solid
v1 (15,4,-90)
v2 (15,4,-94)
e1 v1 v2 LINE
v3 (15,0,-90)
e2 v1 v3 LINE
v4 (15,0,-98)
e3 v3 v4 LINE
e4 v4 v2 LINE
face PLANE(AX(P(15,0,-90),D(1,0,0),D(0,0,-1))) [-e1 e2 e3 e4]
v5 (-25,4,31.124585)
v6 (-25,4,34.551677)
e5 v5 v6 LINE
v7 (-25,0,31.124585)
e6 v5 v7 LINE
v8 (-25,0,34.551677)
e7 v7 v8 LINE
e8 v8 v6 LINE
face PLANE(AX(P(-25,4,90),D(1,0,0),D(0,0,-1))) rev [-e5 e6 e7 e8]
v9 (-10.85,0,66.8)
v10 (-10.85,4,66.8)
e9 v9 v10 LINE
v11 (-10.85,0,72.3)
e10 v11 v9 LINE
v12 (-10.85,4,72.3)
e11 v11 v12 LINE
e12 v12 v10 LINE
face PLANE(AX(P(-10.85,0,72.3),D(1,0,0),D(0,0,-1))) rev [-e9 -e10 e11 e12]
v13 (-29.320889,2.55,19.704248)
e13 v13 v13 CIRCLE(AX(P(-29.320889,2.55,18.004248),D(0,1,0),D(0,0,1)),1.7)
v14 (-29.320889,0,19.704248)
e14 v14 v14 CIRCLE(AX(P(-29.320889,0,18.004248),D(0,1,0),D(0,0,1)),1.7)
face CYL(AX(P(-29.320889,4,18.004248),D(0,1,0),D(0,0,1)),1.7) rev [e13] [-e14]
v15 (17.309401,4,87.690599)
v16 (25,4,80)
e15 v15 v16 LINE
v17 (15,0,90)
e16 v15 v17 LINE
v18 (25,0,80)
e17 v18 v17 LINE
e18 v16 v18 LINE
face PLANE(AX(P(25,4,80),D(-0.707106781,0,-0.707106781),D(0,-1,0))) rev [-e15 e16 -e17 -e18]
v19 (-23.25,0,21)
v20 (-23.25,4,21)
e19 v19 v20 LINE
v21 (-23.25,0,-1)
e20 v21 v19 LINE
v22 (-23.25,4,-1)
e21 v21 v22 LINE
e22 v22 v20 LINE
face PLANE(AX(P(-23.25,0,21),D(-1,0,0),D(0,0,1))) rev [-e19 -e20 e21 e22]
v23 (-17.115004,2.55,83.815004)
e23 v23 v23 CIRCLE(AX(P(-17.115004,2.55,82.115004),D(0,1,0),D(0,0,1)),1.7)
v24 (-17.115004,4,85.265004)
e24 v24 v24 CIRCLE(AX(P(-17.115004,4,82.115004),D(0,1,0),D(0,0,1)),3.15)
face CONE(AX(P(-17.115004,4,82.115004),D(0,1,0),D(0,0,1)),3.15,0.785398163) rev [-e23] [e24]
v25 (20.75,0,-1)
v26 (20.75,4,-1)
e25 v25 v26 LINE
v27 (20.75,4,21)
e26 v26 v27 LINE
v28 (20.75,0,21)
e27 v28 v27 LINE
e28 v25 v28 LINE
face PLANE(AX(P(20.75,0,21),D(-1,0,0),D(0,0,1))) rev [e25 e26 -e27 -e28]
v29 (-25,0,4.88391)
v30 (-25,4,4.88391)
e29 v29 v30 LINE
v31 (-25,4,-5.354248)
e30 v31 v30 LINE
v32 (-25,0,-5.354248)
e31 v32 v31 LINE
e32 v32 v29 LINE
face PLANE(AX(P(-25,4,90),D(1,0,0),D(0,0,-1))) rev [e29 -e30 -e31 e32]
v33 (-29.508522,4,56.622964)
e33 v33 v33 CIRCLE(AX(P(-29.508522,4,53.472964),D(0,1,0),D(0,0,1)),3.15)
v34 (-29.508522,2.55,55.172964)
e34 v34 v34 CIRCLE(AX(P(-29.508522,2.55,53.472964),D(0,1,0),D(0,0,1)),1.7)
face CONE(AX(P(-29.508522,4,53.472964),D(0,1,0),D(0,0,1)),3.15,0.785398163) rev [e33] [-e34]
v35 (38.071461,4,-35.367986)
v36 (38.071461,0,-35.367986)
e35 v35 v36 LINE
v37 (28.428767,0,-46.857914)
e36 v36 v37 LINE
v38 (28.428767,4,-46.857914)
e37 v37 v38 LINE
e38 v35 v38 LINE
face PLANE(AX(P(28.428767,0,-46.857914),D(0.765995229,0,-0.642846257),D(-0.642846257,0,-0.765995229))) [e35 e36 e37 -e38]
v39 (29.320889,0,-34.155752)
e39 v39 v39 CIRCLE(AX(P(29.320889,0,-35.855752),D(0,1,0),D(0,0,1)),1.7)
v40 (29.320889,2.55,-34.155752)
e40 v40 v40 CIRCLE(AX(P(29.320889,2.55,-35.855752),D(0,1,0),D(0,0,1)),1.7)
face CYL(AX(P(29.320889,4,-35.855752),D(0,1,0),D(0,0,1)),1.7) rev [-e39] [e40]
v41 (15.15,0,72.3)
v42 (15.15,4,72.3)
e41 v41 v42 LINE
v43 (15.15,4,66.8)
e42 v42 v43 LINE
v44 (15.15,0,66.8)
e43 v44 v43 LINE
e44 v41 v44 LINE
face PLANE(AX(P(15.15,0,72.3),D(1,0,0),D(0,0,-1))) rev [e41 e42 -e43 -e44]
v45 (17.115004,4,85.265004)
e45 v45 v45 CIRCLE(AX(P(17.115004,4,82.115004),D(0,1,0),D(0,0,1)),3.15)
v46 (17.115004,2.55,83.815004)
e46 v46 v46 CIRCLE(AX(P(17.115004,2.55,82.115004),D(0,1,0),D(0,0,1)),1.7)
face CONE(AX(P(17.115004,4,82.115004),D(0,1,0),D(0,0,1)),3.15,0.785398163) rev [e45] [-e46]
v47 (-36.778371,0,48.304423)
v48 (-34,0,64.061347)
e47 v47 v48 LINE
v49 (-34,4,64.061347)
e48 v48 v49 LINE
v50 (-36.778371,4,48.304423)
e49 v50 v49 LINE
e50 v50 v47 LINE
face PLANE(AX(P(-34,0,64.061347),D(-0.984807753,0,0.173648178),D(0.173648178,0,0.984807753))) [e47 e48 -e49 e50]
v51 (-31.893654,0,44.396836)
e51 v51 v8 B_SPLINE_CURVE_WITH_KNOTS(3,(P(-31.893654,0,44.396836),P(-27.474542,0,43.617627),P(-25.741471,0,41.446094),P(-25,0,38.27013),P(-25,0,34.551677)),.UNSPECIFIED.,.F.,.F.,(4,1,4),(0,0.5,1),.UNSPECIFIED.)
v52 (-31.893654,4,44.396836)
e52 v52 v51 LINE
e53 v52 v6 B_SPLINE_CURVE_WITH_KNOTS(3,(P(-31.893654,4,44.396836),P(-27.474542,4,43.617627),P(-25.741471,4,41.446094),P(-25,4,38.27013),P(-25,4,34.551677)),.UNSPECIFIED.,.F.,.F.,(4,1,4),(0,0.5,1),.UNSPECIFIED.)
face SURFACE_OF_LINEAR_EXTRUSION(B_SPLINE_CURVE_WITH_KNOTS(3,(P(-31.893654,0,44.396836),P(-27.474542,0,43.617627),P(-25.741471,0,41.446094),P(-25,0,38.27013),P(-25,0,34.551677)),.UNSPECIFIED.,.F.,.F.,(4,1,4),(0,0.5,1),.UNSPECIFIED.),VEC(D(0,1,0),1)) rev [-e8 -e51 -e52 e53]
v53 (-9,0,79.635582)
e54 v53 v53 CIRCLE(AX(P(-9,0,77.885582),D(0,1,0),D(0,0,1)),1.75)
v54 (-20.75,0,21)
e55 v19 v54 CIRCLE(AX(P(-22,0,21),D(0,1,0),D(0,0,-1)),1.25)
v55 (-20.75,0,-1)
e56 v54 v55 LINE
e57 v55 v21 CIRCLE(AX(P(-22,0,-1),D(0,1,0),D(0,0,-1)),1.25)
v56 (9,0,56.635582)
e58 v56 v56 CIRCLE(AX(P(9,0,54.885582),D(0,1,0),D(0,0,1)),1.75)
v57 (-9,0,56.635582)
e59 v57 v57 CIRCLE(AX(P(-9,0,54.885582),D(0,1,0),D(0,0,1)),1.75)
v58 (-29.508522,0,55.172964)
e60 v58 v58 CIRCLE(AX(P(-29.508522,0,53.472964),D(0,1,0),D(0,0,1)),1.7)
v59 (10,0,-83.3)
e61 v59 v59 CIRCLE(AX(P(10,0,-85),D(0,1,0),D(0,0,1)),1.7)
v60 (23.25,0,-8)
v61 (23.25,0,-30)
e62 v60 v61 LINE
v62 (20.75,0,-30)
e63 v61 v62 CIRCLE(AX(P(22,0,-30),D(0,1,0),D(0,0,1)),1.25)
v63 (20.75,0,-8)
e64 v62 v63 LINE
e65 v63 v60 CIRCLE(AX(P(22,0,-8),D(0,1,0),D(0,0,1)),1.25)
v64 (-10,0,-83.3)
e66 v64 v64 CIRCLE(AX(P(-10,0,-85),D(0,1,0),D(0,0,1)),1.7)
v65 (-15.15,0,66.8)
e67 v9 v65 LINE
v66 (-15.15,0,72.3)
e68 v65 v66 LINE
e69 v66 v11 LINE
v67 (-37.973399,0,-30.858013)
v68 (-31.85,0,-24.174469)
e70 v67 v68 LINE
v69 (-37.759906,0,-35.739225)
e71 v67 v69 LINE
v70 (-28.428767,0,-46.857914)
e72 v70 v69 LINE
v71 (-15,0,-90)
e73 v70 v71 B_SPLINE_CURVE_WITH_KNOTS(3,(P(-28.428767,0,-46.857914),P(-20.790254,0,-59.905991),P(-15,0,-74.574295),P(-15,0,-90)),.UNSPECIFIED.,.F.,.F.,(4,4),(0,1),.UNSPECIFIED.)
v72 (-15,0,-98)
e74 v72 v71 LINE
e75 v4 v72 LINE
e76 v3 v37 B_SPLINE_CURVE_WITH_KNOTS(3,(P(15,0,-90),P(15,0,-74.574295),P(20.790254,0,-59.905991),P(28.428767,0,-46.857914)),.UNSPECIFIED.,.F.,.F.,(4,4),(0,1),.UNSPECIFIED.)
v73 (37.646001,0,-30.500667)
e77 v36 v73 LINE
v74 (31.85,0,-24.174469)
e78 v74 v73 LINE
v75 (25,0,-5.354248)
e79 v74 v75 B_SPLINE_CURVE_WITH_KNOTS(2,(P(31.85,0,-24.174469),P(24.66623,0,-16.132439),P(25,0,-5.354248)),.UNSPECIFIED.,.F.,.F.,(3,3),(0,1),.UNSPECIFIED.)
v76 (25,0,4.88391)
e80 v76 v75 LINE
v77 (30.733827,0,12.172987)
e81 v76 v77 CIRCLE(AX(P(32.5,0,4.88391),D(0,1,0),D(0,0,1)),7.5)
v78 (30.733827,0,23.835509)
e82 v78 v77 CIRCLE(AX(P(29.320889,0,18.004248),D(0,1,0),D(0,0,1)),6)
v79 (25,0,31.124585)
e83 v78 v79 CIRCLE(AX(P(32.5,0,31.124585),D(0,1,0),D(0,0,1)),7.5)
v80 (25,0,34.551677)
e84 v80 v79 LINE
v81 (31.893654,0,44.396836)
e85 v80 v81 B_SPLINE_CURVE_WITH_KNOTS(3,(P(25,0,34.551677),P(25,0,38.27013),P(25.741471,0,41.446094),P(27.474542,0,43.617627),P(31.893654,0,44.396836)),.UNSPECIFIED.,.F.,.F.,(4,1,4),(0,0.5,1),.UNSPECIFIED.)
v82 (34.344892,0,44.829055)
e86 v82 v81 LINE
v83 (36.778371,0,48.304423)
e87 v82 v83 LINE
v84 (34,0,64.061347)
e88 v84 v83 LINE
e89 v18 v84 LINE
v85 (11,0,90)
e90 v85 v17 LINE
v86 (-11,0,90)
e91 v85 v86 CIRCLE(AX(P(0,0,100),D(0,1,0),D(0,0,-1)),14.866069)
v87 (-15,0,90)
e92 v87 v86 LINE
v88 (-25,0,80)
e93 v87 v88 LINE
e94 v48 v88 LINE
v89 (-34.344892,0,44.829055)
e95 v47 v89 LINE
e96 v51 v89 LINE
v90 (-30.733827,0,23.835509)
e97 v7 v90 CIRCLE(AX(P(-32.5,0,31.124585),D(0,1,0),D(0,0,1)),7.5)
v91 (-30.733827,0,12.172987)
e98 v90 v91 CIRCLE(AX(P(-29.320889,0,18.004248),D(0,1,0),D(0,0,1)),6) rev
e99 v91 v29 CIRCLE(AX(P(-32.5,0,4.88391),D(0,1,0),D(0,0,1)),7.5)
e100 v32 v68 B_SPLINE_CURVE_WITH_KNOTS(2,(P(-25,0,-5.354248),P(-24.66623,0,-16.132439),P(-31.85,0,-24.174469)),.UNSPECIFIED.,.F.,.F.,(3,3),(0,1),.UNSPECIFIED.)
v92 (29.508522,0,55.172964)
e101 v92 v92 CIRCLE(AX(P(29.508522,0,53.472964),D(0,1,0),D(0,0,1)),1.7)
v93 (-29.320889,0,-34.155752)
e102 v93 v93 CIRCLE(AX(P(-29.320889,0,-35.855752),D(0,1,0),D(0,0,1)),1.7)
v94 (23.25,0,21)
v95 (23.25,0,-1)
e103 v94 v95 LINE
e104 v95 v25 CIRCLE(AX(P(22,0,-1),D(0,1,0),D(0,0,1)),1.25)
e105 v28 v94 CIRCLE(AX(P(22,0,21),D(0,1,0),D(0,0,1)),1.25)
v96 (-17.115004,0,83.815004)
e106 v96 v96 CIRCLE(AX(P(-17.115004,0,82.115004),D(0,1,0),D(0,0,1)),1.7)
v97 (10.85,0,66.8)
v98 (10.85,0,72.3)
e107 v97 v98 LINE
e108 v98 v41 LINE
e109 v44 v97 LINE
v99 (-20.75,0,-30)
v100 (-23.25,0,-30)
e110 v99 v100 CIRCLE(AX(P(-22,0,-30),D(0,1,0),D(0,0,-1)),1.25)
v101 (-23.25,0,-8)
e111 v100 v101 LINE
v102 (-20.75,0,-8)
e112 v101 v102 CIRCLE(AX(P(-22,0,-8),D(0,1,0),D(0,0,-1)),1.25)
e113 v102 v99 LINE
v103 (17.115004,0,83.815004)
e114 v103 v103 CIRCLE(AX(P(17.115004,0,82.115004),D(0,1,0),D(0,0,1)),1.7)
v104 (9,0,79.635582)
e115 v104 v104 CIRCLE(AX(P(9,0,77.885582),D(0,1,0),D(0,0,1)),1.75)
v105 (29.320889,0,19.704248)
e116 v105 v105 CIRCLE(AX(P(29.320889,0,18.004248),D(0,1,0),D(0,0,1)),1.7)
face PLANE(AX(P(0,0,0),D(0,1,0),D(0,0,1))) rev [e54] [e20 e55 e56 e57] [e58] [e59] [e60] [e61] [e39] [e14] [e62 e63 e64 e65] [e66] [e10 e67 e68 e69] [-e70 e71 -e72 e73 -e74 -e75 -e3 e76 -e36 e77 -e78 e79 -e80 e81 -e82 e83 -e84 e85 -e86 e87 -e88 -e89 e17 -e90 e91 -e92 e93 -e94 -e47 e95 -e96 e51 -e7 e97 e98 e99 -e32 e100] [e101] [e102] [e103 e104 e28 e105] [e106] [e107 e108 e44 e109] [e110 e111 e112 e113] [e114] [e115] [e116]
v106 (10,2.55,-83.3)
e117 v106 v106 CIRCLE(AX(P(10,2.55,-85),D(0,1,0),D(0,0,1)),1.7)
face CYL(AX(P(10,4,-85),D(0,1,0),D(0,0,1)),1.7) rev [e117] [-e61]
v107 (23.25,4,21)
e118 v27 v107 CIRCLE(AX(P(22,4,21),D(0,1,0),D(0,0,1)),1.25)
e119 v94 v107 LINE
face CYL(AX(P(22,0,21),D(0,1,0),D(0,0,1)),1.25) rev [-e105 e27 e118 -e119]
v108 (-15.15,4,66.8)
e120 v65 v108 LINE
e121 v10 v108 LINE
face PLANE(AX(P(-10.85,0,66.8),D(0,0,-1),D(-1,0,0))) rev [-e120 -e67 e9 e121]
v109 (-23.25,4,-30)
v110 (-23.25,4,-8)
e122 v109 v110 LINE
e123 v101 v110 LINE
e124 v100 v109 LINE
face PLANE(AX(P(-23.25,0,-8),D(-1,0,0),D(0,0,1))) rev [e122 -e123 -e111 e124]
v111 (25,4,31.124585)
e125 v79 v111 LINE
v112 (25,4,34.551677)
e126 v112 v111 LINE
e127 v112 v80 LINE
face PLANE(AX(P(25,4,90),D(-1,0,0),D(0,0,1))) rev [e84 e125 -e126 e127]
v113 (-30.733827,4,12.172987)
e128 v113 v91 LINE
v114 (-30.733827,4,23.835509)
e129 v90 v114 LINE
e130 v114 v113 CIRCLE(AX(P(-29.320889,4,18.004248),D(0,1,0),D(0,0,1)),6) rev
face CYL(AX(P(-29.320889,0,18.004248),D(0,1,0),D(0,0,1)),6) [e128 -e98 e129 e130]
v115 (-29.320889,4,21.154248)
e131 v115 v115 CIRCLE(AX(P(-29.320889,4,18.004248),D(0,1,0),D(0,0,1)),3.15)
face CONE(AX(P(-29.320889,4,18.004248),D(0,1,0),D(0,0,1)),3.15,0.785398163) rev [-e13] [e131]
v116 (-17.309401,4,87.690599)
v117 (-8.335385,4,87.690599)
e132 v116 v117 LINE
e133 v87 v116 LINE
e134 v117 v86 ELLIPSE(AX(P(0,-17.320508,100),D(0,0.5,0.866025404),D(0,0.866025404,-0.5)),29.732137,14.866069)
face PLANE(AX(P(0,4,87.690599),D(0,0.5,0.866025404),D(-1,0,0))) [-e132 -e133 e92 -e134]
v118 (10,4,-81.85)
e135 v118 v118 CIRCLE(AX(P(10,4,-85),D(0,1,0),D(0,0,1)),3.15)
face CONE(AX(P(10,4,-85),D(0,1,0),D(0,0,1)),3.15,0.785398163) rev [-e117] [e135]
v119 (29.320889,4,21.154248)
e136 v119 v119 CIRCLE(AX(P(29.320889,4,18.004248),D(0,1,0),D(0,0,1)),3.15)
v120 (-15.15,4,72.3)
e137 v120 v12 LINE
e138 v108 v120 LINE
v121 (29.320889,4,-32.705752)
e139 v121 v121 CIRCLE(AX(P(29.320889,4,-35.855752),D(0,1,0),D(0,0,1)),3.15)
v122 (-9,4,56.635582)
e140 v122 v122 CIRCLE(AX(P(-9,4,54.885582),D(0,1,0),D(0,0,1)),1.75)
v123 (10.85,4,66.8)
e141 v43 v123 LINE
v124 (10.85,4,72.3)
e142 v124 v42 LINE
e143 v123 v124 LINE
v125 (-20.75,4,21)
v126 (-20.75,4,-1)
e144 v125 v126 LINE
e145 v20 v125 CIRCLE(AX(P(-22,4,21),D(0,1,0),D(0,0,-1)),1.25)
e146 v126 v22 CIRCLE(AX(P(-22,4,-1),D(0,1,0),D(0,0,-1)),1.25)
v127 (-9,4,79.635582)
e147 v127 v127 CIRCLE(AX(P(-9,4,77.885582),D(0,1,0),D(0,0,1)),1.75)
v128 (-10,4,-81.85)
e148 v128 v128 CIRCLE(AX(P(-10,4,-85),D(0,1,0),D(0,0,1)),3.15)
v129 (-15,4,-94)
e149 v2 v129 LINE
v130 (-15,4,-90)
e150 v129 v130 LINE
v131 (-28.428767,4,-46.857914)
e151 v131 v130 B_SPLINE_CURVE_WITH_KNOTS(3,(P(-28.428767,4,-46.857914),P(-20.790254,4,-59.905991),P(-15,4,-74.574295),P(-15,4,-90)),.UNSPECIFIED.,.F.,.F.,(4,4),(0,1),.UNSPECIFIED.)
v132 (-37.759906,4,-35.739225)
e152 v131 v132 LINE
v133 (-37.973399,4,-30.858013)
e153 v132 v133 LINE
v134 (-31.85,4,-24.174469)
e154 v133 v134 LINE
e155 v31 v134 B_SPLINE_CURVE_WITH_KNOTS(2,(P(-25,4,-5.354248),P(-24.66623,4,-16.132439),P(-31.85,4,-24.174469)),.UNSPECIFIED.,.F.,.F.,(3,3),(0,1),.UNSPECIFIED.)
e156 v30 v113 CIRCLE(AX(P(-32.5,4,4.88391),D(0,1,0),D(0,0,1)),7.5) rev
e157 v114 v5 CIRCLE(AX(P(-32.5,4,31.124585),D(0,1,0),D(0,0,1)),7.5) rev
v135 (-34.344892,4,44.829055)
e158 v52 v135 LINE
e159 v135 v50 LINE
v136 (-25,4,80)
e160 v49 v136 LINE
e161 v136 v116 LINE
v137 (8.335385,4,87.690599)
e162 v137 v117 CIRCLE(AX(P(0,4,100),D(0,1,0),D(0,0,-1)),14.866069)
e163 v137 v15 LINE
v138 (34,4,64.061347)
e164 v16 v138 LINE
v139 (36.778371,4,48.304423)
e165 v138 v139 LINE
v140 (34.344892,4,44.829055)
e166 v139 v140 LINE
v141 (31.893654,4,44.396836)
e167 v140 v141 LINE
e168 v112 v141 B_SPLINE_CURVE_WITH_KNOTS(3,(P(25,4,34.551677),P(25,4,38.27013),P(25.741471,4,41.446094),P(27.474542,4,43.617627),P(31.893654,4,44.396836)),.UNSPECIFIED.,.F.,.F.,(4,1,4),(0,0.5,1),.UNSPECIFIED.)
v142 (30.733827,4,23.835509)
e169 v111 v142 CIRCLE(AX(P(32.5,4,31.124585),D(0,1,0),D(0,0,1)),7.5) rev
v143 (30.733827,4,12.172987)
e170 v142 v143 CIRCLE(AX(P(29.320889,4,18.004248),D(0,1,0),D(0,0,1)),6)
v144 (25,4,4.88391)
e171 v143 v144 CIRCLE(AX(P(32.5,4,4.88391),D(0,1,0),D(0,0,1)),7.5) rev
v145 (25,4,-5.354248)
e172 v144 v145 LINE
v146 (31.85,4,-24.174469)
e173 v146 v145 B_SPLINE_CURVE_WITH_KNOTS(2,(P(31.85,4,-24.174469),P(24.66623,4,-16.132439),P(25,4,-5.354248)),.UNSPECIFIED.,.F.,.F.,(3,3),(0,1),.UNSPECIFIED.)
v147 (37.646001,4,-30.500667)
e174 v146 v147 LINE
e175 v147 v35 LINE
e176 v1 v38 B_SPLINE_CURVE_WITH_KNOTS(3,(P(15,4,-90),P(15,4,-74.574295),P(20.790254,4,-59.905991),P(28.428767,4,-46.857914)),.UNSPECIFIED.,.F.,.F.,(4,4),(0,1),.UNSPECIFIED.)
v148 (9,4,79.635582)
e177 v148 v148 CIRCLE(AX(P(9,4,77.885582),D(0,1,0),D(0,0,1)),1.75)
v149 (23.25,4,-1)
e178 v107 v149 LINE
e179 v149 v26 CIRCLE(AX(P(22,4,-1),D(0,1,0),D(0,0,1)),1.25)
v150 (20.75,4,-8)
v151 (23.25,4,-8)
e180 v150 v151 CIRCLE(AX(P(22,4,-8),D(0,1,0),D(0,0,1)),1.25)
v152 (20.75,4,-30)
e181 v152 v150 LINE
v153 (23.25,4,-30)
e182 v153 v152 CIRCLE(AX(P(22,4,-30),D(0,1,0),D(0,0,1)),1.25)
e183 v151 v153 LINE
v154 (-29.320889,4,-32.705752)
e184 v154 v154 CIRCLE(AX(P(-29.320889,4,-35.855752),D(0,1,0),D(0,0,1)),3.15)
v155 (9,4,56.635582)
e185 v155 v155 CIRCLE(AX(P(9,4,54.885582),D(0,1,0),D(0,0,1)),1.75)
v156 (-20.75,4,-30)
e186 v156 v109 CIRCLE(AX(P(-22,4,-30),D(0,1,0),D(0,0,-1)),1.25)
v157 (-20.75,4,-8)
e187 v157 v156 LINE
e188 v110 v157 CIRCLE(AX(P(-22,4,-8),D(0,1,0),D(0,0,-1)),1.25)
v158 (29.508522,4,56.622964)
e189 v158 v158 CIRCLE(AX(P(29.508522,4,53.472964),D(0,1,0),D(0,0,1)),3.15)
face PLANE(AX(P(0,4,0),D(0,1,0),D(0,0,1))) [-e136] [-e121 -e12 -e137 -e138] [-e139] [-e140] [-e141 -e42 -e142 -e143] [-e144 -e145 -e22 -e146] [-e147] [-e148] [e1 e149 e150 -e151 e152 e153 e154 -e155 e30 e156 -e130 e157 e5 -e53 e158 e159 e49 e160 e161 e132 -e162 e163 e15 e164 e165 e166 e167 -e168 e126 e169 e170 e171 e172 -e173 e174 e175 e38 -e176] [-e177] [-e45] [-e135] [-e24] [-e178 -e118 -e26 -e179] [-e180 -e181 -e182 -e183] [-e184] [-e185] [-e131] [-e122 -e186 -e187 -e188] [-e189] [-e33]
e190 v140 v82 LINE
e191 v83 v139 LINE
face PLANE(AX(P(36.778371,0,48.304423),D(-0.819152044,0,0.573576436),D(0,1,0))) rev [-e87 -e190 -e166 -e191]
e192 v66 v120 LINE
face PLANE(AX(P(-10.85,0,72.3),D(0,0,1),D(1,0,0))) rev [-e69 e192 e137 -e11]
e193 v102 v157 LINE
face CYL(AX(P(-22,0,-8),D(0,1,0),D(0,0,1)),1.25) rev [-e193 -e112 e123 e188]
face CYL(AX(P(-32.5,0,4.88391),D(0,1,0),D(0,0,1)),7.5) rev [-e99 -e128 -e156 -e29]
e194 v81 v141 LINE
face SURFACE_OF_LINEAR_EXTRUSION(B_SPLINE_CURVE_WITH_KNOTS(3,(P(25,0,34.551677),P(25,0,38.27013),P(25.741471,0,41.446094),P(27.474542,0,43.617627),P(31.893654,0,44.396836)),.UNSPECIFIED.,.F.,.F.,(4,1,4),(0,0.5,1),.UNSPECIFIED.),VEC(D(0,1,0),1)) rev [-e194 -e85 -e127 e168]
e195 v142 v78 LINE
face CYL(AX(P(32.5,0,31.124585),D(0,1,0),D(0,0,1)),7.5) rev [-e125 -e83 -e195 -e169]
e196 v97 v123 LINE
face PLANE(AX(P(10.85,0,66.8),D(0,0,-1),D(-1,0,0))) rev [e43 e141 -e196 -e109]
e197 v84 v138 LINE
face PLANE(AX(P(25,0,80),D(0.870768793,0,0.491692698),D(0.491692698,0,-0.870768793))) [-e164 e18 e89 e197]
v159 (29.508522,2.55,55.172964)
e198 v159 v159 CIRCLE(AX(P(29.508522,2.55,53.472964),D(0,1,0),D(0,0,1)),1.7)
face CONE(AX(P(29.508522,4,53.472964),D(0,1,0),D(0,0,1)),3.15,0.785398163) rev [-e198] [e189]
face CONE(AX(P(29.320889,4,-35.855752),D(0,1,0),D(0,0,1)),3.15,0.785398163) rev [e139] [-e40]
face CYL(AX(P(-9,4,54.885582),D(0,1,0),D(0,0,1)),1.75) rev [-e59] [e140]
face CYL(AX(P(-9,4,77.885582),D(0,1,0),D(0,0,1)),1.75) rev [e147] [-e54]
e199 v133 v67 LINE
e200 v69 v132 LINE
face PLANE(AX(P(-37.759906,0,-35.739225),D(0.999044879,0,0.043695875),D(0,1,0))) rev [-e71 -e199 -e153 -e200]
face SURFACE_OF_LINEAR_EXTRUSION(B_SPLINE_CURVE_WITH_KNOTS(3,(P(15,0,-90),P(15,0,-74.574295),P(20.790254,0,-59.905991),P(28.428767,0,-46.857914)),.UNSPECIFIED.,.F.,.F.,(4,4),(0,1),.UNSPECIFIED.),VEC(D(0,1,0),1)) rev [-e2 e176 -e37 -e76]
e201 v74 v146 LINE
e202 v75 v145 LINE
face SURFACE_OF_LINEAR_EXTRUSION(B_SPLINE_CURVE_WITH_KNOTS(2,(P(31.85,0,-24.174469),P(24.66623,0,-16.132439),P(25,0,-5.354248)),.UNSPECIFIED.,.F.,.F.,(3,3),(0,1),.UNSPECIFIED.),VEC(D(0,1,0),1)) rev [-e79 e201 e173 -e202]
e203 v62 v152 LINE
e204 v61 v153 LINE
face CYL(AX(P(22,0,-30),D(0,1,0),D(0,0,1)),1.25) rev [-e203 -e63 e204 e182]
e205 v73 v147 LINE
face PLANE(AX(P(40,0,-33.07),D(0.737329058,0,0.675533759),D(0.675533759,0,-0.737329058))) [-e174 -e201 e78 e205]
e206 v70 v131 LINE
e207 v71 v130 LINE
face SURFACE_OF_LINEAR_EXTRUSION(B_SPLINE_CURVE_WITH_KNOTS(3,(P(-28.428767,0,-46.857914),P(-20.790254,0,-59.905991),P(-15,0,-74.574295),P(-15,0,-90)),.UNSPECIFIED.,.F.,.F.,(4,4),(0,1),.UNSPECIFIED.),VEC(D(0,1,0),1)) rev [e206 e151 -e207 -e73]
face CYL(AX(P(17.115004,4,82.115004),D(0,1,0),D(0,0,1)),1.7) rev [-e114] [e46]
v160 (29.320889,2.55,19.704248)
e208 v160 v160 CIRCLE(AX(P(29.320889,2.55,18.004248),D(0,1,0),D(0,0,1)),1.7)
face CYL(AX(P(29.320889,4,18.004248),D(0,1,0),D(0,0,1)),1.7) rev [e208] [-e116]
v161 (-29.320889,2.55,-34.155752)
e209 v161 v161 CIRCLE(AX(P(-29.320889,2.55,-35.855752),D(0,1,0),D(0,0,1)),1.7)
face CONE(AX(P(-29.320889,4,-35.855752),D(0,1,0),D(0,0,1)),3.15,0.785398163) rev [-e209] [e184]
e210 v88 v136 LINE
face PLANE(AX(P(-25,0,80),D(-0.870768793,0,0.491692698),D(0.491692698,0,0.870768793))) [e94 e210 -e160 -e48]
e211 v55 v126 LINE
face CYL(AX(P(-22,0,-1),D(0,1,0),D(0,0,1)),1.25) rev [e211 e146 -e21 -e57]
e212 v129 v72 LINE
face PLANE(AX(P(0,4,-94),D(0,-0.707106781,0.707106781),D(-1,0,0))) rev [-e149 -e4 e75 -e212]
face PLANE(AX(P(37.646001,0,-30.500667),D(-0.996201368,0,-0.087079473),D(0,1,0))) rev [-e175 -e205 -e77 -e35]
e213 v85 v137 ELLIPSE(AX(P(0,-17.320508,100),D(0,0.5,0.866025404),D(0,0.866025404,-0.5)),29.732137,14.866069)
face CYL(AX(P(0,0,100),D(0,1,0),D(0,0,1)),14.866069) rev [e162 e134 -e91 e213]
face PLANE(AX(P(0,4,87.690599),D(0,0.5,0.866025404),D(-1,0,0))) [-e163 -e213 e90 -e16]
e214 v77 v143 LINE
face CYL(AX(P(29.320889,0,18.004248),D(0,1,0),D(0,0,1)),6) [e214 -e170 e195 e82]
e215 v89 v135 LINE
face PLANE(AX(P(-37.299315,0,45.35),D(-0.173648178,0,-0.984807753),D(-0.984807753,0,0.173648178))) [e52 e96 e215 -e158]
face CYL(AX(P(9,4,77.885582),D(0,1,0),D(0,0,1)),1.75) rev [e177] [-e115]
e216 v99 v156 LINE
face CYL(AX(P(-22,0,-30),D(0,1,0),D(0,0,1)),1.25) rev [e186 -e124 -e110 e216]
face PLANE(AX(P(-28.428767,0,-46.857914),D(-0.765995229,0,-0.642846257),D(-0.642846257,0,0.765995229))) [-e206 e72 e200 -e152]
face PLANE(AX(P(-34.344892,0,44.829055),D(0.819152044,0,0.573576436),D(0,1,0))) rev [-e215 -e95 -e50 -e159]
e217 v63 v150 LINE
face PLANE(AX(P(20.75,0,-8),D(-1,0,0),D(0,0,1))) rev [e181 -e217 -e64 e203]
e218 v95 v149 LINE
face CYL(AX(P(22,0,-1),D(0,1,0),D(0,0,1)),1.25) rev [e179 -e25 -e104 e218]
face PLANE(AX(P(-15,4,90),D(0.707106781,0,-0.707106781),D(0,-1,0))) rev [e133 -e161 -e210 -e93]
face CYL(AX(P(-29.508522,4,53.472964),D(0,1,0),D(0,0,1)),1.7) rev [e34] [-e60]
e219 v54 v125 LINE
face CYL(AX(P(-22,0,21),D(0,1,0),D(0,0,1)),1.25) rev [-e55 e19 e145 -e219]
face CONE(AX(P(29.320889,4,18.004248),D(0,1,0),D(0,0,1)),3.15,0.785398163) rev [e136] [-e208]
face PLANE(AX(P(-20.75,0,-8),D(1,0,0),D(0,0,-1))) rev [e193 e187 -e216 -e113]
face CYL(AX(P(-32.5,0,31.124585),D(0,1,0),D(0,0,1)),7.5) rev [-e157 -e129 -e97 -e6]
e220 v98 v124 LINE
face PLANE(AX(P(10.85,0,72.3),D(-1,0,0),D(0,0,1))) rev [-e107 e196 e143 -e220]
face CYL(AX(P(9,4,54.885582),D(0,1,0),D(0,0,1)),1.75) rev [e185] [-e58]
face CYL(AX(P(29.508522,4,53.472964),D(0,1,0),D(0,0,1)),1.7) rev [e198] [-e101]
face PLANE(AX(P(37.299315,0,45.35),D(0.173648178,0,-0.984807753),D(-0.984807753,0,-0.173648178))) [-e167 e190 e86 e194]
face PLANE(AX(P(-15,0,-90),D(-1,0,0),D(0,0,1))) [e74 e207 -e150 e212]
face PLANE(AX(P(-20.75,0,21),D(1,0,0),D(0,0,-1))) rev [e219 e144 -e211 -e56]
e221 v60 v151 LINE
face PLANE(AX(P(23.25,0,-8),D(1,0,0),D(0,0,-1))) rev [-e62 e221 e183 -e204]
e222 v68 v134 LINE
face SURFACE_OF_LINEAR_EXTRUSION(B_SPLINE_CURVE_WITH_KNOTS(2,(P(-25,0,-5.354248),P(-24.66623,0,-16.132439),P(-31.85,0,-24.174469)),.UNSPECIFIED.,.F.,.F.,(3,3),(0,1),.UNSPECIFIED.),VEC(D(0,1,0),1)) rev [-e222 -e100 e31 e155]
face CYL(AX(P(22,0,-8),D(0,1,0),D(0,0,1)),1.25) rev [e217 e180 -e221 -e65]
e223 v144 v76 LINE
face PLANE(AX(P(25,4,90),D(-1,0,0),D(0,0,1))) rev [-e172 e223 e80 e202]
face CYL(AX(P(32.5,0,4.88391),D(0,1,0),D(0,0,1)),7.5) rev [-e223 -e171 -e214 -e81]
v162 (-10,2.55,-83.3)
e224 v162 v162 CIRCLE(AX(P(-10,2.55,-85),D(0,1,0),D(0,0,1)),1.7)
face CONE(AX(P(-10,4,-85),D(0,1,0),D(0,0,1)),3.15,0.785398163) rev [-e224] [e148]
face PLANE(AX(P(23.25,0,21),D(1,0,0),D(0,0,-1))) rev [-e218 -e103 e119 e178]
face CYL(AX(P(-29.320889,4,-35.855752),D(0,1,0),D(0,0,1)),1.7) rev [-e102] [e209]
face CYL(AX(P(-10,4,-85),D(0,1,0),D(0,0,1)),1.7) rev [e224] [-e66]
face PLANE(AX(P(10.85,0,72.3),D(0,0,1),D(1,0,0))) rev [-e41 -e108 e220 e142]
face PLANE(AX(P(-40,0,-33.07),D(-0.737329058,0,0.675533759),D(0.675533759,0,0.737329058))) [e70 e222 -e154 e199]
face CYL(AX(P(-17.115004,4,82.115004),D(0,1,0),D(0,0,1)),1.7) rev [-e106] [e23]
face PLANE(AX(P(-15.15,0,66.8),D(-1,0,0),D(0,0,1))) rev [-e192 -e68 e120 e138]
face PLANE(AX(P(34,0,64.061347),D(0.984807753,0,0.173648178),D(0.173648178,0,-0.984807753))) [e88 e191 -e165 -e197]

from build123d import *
from OCP.BRepFilletAPI import BRepFilletAPI_MakeChamfer

# Parameters (mm, degrees)
SKETCH1_W                                       = 50
SKETCH1_H                                       = 180
BOSS_EXTRUDE1_DEPTH                             = 4
CHAMFER1_SIZE                                   = 10
CSK_FOR_M3_FLAT_HEAD_MACHINE_SCREW1_D           = 3.4
CSK_FOR_M3_FLAT_HEAD_MACHINE_SCREW1_CSINK_D     = 6.3
CSK_FOR_M3_FLAT_HEAD_MACHINE_SCREW1_CSINK_ANGLE = 90
CSK_FOR_M3_FLAT_HEAD_MACHINE_SCREW2_D           = 3.4
CSK_FOR_M3_FLAT_HEAD_MACHINE_SCREW2_CSINK_D     = 6.3
CSK_FOR_M3_FLAT_HEAD_MACHINE_SCREW2_CSINK_ANGLE = 90
SKETCH8_W                                       = 4.3
SKETCH8_H                                       = 5.5
CUT_EXTRUDE3_DEPTH                              = 94.493315269
CUT_EXTRUDE7_DEPTH                              = 94.493315269
CUT_EXTRUDE8_DEPTH                              = 94.493315269
BOSS_EXTRUDE4_DEPTH                             = 4
BOSS_EXTRUDE5_DEPTH                             = 4
CSK_FOR_M3_FLAT_HEAD_MACHINE_SCREW3_D           = 3.4
CSK_FOR_M3_FLAT_HEAD_MACHINE_SCREW3_CSINK_D     = 6.3
CSK_FOR_M3_FLAT_HEAD_MACHINE_SCREW3_CSINK_ANGLE = 90
CHAMFER6_SIZE                                   = 7
CHAMFER6_SIZE2                                  = 8.629621363
CUT_EXTRUDE10_DEPTH                             = 99.569772243
CHAMFER7_SIZE                                   = 3
CHAMFER7_SIZE2                                  = 3.484649721
CUT_EXTRUDE11_DEPTH                             = 98.803047806
CUT_EXTRUDE12_DEPTH                             = 98.803047941
CUT_EXTRUDE13_DEPTH                             = 98.803047941
SKETCH35_R                                      = 6
BOSS_EXTRUDE6_DEPTH                             = 4
FILLET1_R                                       = 7.5
CSK_FOR_M3_FLAT_HEAD_MACHINE_SCREW4_D           = 3.4
CSK_FOR_M3_FLAT_HEAD_MACHINE_SCREW4_CSINK_D     = 6.3
CSK_FOR_M3_FLAT_HEAD_MACHINE_SCREW4_CSINK_ANGLE = 90
SKETCH38_W                                      = 30
SKETCH38_H                                      = 8
BOSS_EXTRUDE7_DEPTH                             = 4
CHAMFER8_SIZE                                   = 4
CHAMFER9_SIZE                                   = 2.309401077
CHAMFER9_SIZE_2                                 = 4
CUT_EXTRUDE14_DEPTH                             = 106.211388111
F_3_5_3_5_DIAMETER_HOLE3_D                      = 3.5


with BuildPart() as part:
    # Sketch1 → Boss-Extrude1 (new body)
    with BuildSketch(Plane(origin=(0, 0, 0), x_dir=(1, 0, 0), z_dir=(0, 1, 0))):
        Rectangle(SKETCH1_W, SKETCH1_H)
    extrude(amount=BOSS_EXTRUDE1_DEPTH)

    # Chamfer1
    chamfer1_edges = [part.edges().sort_by_distance(p)[0] for p in [
        (-25, 2, -90),
        (25, 2, -90),
        (25, 2, 90),
        (-25, 2, 90),
    ]]
    chamfer(chamfer1_edges, length=CHAMFER1_SIZE)

    # CSK for M3 Flat Head Machine Screw1 (through all)
    with Locations(Plane(origin=(0, 4, 0), x_dir=(1, 0, 0), z_dir=(0, 1, 0))):
        with Locations((17.115004333, -82.115004333), (-17.115004333, -82.115004333)):
            CounterSinkHole(CSK_FOR_M3_FLAT_HEAD_MACHINE_SCREW1_D / 2, CSK_FOR_M3_FLAT_HEAD_MACHINE_SCREW1_CSINK_D / 2, counter_sink_angle=CSK_FOR_M3_FLAT_HEAD_MACHINE_SCREW1_CSINK_ANGLE)

    # CSK for M3 Flat Head Machine Screw2 (through all)
    with Locations(Plane(origin=(0, 4, 0), x_dir=(1, 0, 0), z_dir=(0, 1, 0))):
        with Locations((10, 85), (-10, 85)):
            CounterSinkHole(CSK_FOR_M3_FLAT_HEAD_MACHINE_SCREW2_D / 2, CSK_FOR_M3_FLAT_HEAD_MACHINE_SCREW2_CSINK_D / 2, counter_sink_angle=CSK_FOR_M3_FLAT_HEAD_MACHINE_SCREW2_CSINK_ANGLE)

    # Sketch8 → Cut-Extrude3 (cut, through all)
    with BuildSketch(Plane(origin=(0, 4, 0), x_dir=(1, 0, 0), z_dir=(0, 1, 0))):
        with Locations((13, -69.55)):
            Rectangle(SKETCH8_W, SKETCH8_H)
        with Locations((-13, -69.55)):
            Rectangle(SKETCH8_W, SKETCH8_H)
    extrude(amount=-CUT_EXTRUDE3_DEPTH, mode=Mode.SUBTRACT)

    # Sketch12 → Cut-Extrude7 (cut, through all)
    with BuildSketch(Plane(origin=(0, 4, 0), x_dir=(1, 0, 0), z_dir=(0, 1, 0))):
        with BuildLine():
            Line((20.75, -21), (20.75, 1))
            ThreePointArc((20.75, 1), (22, 2.25), (23.25, 1))
            Line((23.25, 1), (23.25, -21))
            ThreePointArc((23.25, -21), (22, -22.25), (20.75, -21))
        make_face()
        with BuildLine():
            Line((-20.75, -21), (-20.75, 1))
            ThreePointArc((-20.75, 1), (-22, 2.25), (-23.25, 1))
            Line((-23.25, 1), (-23.25, -21))
            ThreePointArc((-23.25, -21), (-22, -22.25), (-20.75, -21))
        make_face()
    extrude(amount=-CUT_EXTRUDE7_DEPTH, mode=Mode.SUBTRACT)

    # Sketch14 → Cut-Extrude8 (cut, through all)
    with BuildSketch(Plane(origin=(0, 4, 0), x_dir=(1, 0, 0), z_dir=(0, 1, 0))):
        with BuildLine():
            Line((-11, -90), (11, -90))
            ThreePointArc((11, -90), (0, -85.133931253), (-11, -90))
        make_face()
    extrude(amount=-CUT_EXTRUDE8_DEPTH, mode=Mode.SUBTRACT)

    # Sketch22 → Boss-Extrude4 (add, through all)
    with BuildSketch(Plane(origin=(0, 4, 0), x_dir=(1, 0, 0), z_dir=(0, 1, 0))):
        Polygon((40, 33.07), (31.85, 24.174468516), (25, 5.354248193), (25, 59.654248193), (28.428767382, 46.857914117), align=None)
        Polygon((-28.428767382, 46.857914117), (-25, 59.654248193), (-25, 5.354248193), (-31.85, 24.174468516), (-40, 33.07), align=None)
    extrude(amount=-BOSS_EXTRUDE4_DEPTH)

    # Sketch25 → Boss-Extrude5 (add, through all)
    with BuildSketch(Plane(origin=(0, 4, 0), x_dir=(1, 0, 0), z_dir=(0, 1, 0))):
        Polygon((25, -43.181298855), (25, -80), (34, -64.061347307), (37.299315376, -45.35), align=None)
        Polygon((-37.299315376, -45.35), (-25, -43.181298855), (-25, -80), (-34, -64.061347307), align=None)
    extrude(amount=-BOSS_EXTRUDE5_DEPTH)

    # CSK for M3 Flat Head Machine Screw3 (through all)
    with Locations(Plane(origin=(0, 4, 0), x_dir=(1, 0, 0), z_dir=(0, 1, 0))):
        with Locations((29.508521961, -53.472963553), (-29.508521961, -53.472963553), (29.320888862, 35.855752194), (-29.320888862, 35.855752194)):
            CounterSinkHole(CSK_FOR_M3_FLAT_HEAD_MACHINE_SCREW3_D / 2, CSK_FOR_M3_FLAT_HEAD_MACHINE_SCREW3_CSINK_D / 2, counter_sink_angle=CSK_FOR_M3_FLAT_HEAD_MACHINE_SCREW3_CSINK_ANGLE)

    # Chamfer6: one chamfer whose edges measure the first distance from different faces: ONE call of the kernel's chamfer builder (chamfer() names one face for all edges)
    chamfer6_edges_1 = [part.edges().sort_by_distance(p)[0] for p in [
        (25, 2, 43.181298855),
    ]]
    chamfer6_side_1 = [part.faces().sort_by_distance(p)[0] for p in [
        (31.149657688, 2, 44.265649428),
    ]]
    chamfer6_edges_2 = [part.edges().sort_by_distance(p)[0] for p in [
        (-25, 2, 43.181298855),
    ]]
    chamfer6_side_2 = [part.faces().sort_by_distance(p)[0] for p in [
        (-31.149657688, 2, 44.265649428),
    ]]
    chamfer6 = BRepFilletAPI_MakeChamfer(part.part.solid().wrapped)
    for e in chamfer6_edges_1:
        chamfer6.Add(CHAMFER6_SIZE, CHAMFER6_SIZE2, e.wrapped, chamfer6_side_1[0].wrapped)  # the first distance lies on this face
    for e in chamfer6_edges_2:
        chamfer6.Add(CHAMFER6_SIZE, CHAMFER6_SIZE2, e.wrapped, chamfer6_side_2[0].wrapped)  # the first distance lies on this face
    add(Compound.cast(chamfer6.Shape()), mode=Mode.REPLACE)

    # Sketch28 → Cut-Extrude10 (cut, through all)
    with BuildSketch(Plane(origin=(0, 4, 0), x_dir=(1, 0, 0), z_dir=(0, 1, 0))):
        Polygon((25, 59.654248193), (15, 90), (25, 80), align=None)
        Polygon((-25, 80), (-25, 59.654248193), (-15, 90), align=None)
    extrude(amount=-CUT_EXTRUDE10_DEPTH, mode=Mode.SUBTRACT)

    # Chamfer7: one chamfer whose edges measure the first distance from different faces: ONE call of the kernel's chamfer builder (chamfer() names one face for all edges)
    chamfer7_edges_1 = [part.edges().sort_by_distance(p)[0] for p in [
        (40, 2, -33.07),
    ]]
    chamfer7_side_1 = [part.faces().sort_by_distance(p)[0] for p in [
        (34.214383691, 2, -39.963957058),
    ]]
    chamfer7_edges_2 = [part.edges().sort_by_distance(p)[0] for p in [
        (-40, 2, -33.07),
    ]]
    chamfer7_side_2 = [part.faces().sort_by_distance(p)[0] for p in [
        (-35.925, 2, -28.622234258),
    ]]
    chamfer7_edges_3 = [part.edges().sort_by_distance(p)[0] for p in [
        (37.299315376, 2, 45.35),
        (-37.299315376, 2, 45.35),
    ]]
    chamfer7 = BRepFilletAPI_MakeChamfer(part.part.solid().wrapped)
    for e in chamfer7_edges_1:
        chamfer7.Add(CHAMFER7_SIZE, CHAMFER7_SIZE2, e.wrapped, chamfer7_side_1[0].wrapped)  # the first distance lies on this face
    for e in chamfer7_edges_2:
        chamfer7.Add(CHAMFER7_SIZE, CHAMFER7_SIZE2, e.wrapped, chamfer7_side_2[0].wrapped)  # the first distance lies on this face
    for e in chamfer7_edges_3:
        chamfer7.Add(CHAMFER7_SIZE, e.wrapped)
    add(Compound.cast(chamfer7.Shape()), mode=Mode.REPLACE)

    # Sketch29 → Cut-Extrude11 (cut, through all)
    with BuildSketch(Plane(origin=(0, 4, 0), x_dir=(1, 0, 0), z_dir=(0, 1, 0))):
        with BuildLine():
            Line((15, 90), (25, 59.654248193))
            Line((25, 59.654248193), (28.428767382, 46.857914117))
            add(Edge.make_bspline(
                [(28.428767382, 46.857914117), (20.790254016, 59.905991383), (15, 74.574295018), (15, 90)],
                knots=[0, 0, 0, 0, 1, 1, 1, 1], degree=3))
        make_face()
        with BuildLine():
            Line((-25, 59.654248193), (-28.428767382, 46.857914117))
            add(Edge.make_bspline(
                [(-28.428767382, 46.857914117), (-20.790254016, 59.905991383), (-15, 74.574295018), (-15, 90)],
                knots=[0, 0, 0, 0, 1, 1, 1, 1], degree=3))
            Line((-15, 90), (-25, 59.654248193))
        make_face()
    extrude(amount=-CUT_EXTRUDE11_DEPTH, mode=Mode.SUBTRACT)

    # Sketch30 → Cut-Extrude12 (cut, through all)
    with BuildSketch(Plane(origin=(0, 4, 0), x_dir=(1, 0, 0), z_dir=(0, 1, 0))):
        with BuildLine():
            Line((31.85, 24.174468516), (25, 5.354248193))
            add(Edge.make_bspline(
                [(25, 5.354248193), (24.666229517, 16.132438928), (31.85, 24.174468516)],
                knots=[0, 0, 0, 1, 1, 1], degree=2))
        make_face()
        with BuildLine():
            Line((-31.85, 24.174468516), (-25, 5.354248193))
            add(Edge.make_bspline(
                [(-25, 5.354248193), (-24.666229517, 16.132438928), (-31.85, 24.174468516)],
                knots=[0, 0, 0, 1, 1, 1], degree=2))
        make_face()
    extrude(amount=-CUT_EXTRUDE12_DEPTH, mode=Mode.SUBTRACT)

    # Sketch31 → Cut-Extrude13 (cut, through all)
    with BuildSketch(Plane(origin=(0, 4, 0), x_dir=(1, 0, 0), z_dir=(0, 1, 0))):
        with BuildLine():
            Line((25, -34.551677492), (31.893654271, -44.396836099))
            add(Edge.make_bspline(
                [(25, -34.551677492), (25, -38.270129885), (25.741471245, -41.446093621), (27.474541521, -43.61762729), (31.893654271, -44.396836099)],
                knots=[0, 0, 0, 0, 0.5, 1, 1, 1, 1], degree=3))
        make_face()
        with BuildLine():
            Line((-25, -34.551677492), (-31.893654271, -44.396836099))
            add(Edge.make_bspline(
                [(-25, -34.551677492), (-25, -38.270129885), (-25.741471245, -41.446093621), (-27.474541521, -43.61762729), (-31.893654271, -44.396836099)],
                knots=[0, 0, 0, 0, 0.5, 1, 1, 1, 1], degree=3))
        make_face()
    extrude(amount=-CUT_EXTRUDE13_DEPTH, mode=Mode.SUBTRACT)

    # Sketch35 → Boss-Extrude6 (add, through all)
    with BuildSketch(Plane(origin=(0, 4, 0), x_dir=(1, 0, 0), z_dir=(0, 1, 0))):
        with Locations((-29.320888862, -18.004247806)):
            Circle(SKETCH35_R)
        with BuildLine():
            Line((-25, -12.004247806), (-29.320888862, -12.004247806))
            ThreePointArc((-29.320888862, -12.004247806), (-26.973287097, -12.482584474), (-25, -13.841325823))
            Line((-25, -13.841325823), (-25, -12.004247806))
        make_face()
        with BuildLine():
            Line((-29.320888862, -24.004247806), (-25, -24.004247806))
            Line((-25, -24.004247806), (-25, -22.16716979))
            ThreePointArc((-25, -22.16716979), (-26.973287097, -23.525911138), (-29.320888862, -24.004247806))
        make_face()
        with Locations((29.320888862, -18.004247806)):
            Circle(SKETCH35_R)
        with BuildLine():
            ThreePointArc((25, -13.841325823), (26.973287097, -12.482584474), (29.320888862, -12.004247806))
            Line((29.320888862, -12.004247806), (25, -12.004247806))
            Line((25, -12.004247806), (25, -13.841325823))
        make_face()
        with BuildLine():
            Line((25, -24.004247806), (29.320888862, -24.004247806))
            ThreePointArc((29.320888862, -24.004247806), (26.973287097, -23.525911138), (25, -22.16716979))
            Line((25, -22.16716979), (25, -24.004247806))
        make_face()
    extrude(amount=-BOSS_EXTRUDE6_DEPTH)

    # Fillet1
    fillet1_edges = [part.edges().sort_by_distance(p)[0] for p in [
        (-25, 2, 12.004247806),
        (-25, 2, 24.004247806),
        (25, 2, 24.004247806),
        (25, 2, 12.004247806),
    ]]
    fillet(fillet1_edges, radius=FILLET1_R)

    # CSK for M3 Flat Head Machine Screw4 (through all)
    with Locations(Plane(origin=(0, 4, 0), x_dir=(1, 0, 0), z_dir=(0, 1, 0))):
        with Locations((29.320888862, -18.004247806), (-29.320888862, -18.004247806)):
            CounterSinkHole(CSK_FOR_M3_FLAT_HEAD_MACHINE_SCREW4_D / 2, CSK_FOR_M3_FLAT_HEAD_MACHINE_SCREW4_CSINK_D / 2, counter_sink_angle=CSK_FOR_M3_FLAT_HEAD_MACHINE_SCREW4_CSINK_ANGLE)

    # Sketch38 → Boss-Extrude7 (add, through all)
    with BuildSketch(Plane(origin=(0, 4, 0), x_dir=(1, 0, 0), z_dir=(0, 1, 0))):
        with Locations((0, 94)):
            Rectangle(SKETCH38_W, SKETCH38_H)
    extrude(amount=-BOSS_EXTRUDE7_DEPTH)

    # Chamfer8
    chamfer8_edges = [part.edges().sort_by_distance(p)[0] for p in [
        (0, 4, -98),
    ]]
    chamfer(chamfer8_edges, length=CHAMFER8_SIZE - 0.0001)  # a hair under: the kernel refuses the full size

    # Chamfer9
    chamfer9_edges_1 = [part.edges().sort_by_distance(p)[0] for p in [
        (13, 4, 90),
    ]]
    chamfer9_side_1 = [part.faces().sort_by_distance(p)[0] for p in [
        (13, 4, 89.953811978),
    ]]
    chamfer9_edges_2 = [part.edges().sort_by_distance(p)[0] for p in [
        (-13, 4, 90),
    ]]
    chamfer9_side_2 = [part.faces().sort_by_distance(p)[0] for p in [
        (-13, 4, 89.953811978),
    ]]
    chamfer9 = BRepFilletAPI_MakeChamfer(part.part.solid().wrapped)
    for e in chamfer9_edges_1:
        chamfer9.Add(CHAMFER9_SIZE - 0.0001, CHAMFER9_SIZE_2 - 0.0001, e.wrapped, chamfer9_side_1[0].wrapped)
    for e in chamfer9_edges_2:
        chamfer9.Add(CHAMFER9_SIZE - 0.0001, CHAMFER9_SIZE_2 - 0.0001, e.wrapped, chamfer9_side_2[0].wrapped)
    add(Compound.cast(chamfer9.Shape()), mode=Mode.REPLACE)  # a hair under: the kernel refuses the full size

    # Sketch41 → Cut-Extrude14 (cut, through all)
    with BuildSketch(Plane(origin=(0, 4, 0), x_dir=(1, 0, 0), z_dir=(0, 1, 0))):
        with BuildLine():
            Line((20.75, 8), (20.75, 30))
            ThreePointArc((20.75, 30), (22, 31.25), (23.25, 30))
            Line((23.25, 30), (23.25, 8))
            ThreePointArc((23.25, 8), (22, 6.75), (20.75, 8))
        make_face()
        with BuildLine():
            Line((-20.75, 8), (-20.75, 30))
            ThreePointArc((-20.75, 30), (-22, 31.25), (-23.25, 30))
            Line((-23.25, 30), (-23.25, 8))
            ThreePointArc((-23.25, 8), (-22, 6.75), (-20.75, 8))
        make_face()
    extrude(amount=-CUT_EXTRUDE14_DEPTH, mode=Mode.SUBTRACT)

    # Ø3.5 (3.5) Diameter Hole3 (through all)
    with Locations(Plane(origin=(0, 4, 0), x_dir=(1, 0, 0), z_dir=(0, 1, 0))):
        with Locations((-9, -54.885582313), (-9, -77.885582313), (9, -77.885582313), (9, -54.885582313)):
            Hole(F_3_5_3_5_DIAMETER_HOLE3_D / 2)


solid = part.part
